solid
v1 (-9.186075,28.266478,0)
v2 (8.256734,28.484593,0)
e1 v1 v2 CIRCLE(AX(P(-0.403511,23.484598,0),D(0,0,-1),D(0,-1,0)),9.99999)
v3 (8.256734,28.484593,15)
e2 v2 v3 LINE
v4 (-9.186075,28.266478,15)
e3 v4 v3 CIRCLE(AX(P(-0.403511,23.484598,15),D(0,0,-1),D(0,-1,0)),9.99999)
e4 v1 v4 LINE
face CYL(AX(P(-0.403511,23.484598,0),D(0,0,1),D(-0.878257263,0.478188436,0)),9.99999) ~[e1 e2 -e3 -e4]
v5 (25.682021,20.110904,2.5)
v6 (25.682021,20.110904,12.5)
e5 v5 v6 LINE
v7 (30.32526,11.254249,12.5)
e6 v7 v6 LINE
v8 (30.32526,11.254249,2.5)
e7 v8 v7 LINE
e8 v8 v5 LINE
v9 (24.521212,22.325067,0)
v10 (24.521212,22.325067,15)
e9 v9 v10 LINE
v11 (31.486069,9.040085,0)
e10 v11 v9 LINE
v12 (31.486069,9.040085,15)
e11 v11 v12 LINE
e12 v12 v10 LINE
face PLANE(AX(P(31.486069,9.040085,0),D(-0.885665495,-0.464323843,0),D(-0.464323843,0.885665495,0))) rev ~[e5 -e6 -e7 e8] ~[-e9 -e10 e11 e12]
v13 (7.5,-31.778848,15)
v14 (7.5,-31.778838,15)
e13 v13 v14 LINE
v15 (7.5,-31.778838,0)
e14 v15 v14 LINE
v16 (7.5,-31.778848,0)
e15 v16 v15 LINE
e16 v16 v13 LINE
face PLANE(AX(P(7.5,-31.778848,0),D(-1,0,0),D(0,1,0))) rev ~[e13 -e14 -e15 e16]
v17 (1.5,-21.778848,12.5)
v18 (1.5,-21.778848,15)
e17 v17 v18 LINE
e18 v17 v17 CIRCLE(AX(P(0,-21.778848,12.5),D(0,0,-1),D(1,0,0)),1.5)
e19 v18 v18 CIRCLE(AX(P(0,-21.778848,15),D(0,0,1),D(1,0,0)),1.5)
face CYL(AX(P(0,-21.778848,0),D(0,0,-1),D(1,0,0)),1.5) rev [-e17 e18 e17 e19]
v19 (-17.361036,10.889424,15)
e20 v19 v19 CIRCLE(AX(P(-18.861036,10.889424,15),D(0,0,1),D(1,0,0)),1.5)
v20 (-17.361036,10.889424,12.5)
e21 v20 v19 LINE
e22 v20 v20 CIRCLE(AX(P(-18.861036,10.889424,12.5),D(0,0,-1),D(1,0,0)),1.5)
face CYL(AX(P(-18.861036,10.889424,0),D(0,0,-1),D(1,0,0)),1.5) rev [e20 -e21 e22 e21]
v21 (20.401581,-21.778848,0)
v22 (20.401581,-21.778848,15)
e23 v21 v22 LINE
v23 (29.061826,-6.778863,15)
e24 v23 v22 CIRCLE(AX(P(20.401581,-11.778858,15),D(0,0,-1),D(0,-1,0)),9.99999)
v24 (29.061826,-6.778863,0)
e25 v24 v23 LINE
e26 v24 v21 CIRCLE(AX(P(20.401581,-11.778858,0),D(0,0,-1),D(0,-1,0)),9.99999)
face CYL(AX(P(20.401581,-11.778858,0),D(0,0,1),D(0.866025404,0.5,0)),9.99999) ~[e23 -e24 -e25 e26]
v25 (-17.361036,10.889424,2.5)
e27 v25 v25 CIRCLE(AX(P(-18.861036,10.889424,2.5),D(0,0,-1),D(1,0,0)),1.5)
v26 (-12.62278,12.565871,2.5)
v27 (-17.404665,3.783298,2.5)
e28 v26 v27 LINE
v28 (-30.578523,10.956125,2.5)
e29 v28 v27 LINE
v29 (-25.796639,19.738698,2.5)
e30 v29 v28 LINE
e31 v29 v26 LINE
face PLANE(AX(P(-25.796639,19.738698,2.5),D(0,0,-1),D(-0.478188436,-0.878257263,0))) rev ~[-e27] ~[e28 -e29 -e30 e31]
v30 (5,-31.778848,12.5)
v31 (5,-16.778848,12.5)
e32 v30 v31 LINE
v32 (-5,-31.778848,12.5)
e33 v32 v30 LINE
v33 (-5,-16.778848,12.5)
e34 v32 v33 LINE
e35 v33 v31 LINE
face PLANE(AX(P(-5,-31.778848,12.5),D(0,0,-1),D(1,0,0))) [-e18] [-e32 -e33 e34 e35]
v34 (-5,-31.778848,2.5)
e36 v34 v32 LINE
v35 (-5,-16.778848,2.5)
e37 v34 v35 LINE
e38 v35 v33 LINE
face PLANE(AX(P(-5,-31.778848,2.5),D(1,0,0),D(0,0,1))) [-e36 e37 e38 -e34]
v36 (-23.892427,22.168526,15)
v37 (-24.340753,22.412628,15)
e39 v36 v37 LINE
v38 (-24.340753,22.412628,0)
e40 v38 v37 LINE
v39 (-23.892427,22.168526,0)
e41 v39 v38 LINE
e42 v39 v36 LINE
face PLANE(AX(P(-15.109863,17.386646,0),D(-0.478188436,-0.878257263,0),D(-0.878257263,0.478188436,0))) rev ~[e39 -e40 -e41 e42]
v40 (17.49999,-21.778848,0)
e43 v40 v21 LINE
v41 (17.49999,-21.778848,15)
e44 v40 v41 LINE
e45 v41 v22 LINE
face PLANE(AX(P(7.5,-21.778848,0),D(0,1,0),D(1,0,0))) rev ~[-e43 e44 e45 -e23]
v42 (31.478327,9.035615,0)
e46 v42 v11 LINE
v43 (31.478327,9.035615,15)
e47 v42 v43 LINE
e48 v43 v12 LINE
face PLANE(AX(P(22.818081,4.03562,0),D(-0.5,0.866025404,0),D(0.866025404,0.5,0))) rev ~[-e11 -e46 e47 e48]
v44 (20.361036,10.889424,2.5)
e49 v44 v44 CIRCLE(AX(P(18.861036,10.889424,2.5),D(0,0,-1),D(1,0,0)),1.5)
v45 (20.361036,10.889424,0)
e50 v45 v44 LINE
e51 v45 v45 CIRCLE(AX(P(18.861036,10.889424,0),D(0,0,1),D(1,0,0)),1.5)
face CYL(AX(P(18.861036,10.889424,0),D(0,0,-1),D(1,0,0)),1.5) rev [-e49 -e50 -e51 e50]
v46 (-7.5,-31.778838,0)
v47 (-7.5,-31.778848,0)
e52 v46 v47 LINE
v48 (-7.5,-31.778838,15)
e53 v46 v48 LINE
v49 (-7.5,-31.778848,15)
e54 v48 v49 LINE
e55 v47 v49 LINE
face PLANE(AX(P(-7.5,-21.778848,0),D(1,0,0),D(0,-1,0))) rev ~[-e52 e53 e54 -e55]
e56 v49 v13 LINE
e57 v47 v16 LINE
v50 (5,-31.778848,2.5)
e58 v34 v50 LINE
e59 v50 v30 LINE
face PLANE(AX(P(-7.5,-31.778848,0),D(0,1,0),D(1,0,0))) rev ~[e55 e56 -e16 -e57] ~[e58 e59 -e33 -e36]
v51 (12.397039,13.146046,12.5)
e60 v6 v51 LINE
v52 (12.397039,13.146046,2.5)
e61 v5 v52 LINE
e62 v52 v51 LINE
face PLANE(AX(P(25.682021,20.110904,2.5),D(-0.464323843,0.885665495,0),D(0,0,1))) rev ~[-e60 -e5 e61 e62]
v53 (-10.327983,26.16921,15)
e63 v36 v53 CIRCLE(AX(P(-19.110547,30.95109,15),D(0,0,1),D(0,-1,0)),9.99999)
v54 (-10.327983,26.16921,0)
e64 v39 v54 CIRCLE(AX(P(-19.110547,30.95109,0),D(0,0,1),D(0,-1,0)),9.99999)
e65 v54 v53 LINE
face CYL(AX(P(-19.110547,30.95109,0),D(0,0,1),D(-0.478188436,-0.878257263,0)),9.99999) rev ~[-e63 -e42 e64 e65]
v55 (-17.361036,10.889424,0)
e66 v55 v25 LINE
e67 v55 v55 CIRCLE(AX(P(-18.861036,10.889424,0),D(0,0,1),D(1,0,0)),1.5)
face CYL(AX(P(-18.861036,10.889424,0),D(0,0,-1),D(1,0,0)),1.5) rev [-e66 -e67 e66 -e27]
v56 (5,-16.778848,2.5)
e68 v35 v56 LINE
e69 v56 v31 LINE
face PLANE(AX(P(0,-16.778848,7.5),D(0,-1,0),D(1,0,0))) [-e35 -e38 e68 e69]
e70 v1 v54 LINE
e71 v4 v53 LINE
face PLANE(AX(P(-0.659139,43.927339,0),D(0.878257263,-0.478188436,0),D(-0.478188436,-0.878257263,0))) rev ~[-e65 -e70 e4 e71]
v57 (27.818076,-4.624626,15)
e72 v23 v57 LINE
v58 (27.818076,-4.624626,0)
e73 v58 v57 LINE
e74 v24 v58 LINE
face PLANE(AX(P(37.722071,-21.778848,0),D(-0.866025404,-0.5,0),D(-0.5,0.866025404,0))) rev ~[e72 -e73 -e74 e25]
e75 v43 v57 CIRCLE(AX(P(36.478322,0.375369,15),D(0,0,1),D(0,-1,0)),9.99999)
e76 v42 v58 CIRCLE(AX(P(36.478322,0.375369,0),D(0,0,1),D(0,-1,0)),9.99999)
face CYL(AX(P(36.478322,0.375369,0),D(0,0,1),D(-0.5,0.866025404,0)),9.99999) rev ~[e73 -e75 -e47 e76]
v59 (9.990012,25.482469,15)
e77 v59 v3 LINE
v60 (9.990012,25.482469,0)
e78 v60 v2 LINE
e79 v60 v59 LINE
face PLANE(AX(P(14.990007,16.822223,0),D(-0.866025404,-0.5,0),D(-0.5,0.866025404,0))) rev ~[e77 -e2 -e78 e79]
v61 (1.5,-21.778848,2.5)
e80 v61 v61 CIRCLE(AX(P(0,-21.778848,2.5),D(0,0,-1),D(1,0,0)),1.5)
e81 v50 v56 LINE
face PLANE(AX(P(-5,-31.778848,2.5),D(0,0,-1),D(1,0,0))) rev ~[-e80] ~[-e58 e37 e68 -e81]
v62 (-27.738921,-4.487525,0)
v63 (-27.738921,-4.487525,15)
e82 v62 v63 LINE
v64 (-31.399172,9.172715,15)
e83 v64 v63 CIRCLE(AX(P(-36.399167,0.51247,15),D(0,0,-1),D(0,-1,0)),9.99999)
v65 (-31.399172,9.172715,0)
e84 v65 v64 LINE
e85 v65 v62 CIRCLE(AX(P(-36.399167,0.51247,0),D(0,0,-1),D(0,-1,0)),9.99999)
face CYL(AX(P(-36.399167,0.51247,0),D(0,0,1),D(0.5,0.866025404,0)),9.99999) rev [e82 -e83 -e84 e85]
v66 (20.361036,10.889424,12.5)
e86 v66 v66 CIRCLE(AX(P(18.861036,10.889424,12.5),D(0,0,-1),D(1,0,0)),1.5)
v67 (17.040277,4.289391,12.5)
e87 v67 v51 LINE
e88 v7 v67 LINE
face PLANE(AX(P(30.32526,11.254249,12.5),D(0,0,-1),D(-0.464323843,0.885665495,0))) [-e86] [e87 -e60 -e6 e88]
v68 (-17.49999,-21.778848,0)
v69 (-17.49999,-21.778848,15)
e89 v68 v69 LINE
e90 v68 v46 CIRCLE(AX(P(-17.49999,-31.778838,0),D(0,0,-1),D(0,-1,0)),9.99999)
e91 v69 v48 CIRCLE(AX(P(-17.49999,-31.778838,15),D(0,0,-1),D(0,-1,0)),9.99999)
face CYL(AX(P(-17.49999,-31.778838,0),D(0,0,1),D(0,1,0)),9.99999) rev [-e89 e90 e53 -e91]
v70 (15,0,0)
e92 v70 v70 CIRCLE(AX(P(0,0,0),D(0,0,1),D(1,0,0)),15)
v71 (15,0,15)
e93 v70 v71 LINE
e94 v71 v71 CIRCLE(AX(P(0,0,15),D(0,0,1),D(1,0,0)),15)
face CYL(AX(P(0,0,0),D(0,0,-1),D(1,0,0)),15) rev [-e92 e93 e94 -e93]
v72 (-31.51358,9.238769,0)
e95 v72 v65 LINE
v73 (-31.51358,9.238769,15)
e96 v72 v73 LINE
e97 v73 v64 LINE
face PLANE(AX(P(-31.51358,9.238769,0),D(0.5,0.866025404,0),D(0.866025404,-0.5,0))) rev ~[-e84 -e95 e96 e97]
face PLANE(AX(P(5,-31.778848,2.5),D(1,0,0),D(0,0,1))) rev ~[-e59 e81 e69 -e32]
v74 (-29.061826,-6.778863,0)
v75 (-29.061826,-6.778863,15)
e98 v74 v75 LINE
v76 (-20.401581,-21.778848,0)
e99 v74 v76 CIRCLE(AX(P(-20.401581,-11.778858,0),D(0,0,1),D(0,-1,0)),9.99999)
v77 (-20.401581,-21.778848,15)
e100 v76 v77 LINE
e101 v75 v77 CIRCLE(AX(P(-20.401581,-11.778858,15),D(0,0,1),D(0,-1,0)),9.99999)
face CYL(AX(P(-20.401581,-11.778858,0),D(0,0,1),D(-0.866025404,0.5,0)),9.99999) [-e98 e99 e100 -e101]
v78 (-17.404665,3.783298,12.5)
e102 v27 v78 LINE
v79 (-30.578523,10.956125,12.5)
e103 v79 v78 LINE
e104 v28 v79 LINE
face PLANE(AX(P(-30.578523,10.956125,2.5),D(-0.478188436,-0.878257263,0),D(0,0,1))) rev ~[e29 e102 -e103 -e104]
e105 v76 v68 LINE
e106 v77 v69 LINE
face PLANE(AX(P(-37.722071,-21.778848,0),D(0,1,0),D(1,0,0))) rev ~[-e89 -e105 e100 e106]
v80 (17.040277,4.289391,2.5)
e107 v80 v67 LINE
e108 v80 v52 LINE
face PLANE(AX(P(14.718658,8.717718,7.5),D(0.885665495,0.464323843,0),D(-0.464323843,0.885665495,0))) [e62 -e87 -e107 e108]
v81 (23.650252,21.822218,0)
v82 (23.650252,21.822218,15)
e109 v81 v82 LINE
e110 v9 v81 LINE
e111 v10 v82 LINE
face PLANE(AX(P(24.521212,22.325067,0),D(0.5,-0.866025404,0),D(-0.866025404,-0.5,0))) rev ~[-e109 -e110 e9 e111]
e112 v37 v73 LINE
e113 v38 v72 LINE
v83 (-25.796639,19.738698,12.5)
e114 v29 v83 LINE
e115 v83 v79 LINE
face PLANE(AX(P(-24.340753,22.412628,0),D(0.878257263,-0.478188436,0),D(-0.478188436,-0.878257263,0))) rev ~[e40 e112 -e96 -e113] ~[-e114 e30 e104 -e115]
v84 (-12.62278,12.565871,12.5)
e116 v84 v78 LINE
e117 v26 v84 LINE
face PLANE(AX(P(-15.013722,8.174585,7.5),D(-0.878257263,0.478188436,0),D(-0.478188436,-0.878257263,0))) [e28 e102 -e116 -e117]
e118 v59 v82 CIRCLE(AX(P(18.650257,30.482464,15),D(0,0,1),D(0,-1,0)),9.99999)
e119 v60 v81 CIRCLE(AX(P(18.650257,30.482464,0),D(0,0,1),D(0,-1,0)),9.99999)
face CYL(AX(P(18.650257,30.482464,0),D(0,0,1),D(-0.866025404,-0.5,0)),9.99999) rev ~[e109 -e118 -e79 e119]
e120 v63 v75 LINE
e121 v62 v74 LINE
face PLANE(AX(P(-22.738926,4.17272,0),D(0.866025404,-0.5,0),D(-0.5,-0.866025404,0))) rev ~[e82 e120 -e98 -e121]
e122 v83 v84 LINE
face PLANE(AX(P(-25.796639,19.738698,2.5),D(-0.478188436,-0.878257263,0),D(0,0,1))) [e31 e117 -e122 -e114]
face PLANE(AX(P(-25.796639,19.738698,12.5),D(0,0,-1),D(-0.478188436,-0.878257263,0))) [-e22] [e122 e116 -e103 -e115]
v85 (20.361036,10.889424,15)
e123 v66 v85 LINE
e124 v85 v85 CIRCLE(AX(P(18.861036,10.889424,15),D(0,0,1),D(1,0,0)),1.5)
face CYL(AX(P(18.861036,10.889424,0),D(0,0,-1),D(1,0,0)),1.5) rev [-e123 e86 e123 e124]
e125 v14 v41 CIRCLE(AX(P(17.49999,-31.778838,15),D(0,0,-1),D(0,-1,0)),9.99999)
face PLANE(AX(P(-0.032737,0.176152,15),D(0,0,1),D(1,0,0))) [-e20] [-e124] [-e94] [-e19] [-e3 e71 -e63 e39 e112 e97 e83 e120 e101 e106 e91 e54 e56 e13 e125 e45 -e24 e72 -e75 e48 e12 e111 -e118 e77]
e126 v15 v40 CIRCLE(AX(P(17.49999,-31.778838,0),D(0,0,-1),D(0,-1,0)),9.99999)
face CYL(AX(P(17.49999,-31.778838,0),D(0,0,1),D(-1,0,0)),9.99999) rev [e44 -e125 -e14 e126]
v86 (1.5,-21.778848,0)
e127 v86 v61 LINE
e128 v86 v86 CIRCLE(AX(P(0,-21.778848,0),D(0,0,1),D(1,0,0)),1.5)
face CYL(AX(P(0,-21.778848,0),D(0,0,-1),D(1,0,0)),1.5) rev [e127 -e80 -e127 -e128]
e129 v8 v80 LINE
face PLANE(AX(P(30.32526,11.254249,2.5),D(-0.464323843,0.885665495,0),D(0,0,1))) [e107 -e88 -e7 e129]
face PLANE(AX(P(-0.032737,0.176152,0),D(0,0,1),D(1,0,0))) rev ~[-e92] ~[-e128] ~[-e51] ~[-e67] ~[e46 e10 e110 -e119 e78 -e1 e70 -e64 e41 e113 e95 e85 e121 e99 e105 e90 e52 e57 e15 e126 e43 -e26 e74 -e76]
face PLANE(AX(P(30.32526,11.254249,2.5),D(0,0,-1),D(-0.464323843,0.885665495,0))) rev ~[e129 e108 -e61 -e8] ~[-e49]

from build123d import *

# Parameters (mm, degrees)
F0_R     = 1.5
F0_R_2   = 15
F1_DEPTH = 15
F2_W     = 10
F2_H     = 10
F3_DEPTH = 15
F4_W     = 10
F4_H     = 10
F5_DEPTH = 15
F6_W     = 10
F6_H     = 10
F7_DEPTH = 15
F8_R     = 9.99999


# Not quite as in the source:
# - a fillet or chamfer is up to 0.001 mm smaller than in the source, because OpenCascade refuses the exact size


with BuildPart() as f1:
    # F0 (on Top) → F1 (new body)
    with BuildSketch(Plane.XY):
        Polygon((-24.3407530135, 22.4126278684), (-31.5135795584, 9.2387689289), (-22.7389262459, 4.1727204769), (-37.7220713048, -21.7788480222), (-7.5, -21.7788480222), (-7.5, -31.7788480222), (0, -31.7788480222), (7.5, -31.7788480222), (7.5, -21.7788480222), (37.7220713048, -21.7788480222), (22.8180813967, 4.0356197342), (31.4860692862, 9.0400848755), (24.5212116355, 22.3250672958), (14.9900065464, 16.8222234719), (-0.6591394661, 43.9273394607), (-15.1098627306, 17.3866460996), align=None)
        with Locations((0, -21.7788480222)):
            Circle(F0_R, mode=Mode.SUBTRACT)
        Circle(F0_R_2, mode=Mode.SUBTRACT)
        with Locations((-18.8610356524, 10.8894240111)):
            Circle(F0_R, mode=Mode.SUBTRACT)
        with Locations((18.8610356524, 10.8894240111)):
            Circle(F0_R, mode=Mode.SUBTRACT)
    extrude(amount=F1_DEPTH)

    # F2 (on face) → F3 (cut)
    with BuildSketch(Plane.XZ.offset(31.7788480222)):
        with Locations((0, 7.5)):
            Rectangle(F2_W, F2_H)
    extrude(amount=-F3_DEPTH, mode=Mode.SUBTRACT)

    # F4 (on face) → F5 (cut)
    with BuildSketch(Plane(origin=(-28.1875812899, 15.3474112818, 0), x_dir=(-0.4781884363, -0.8782572626, 0), z_dir=(-0.8782572626, 0.4781884363, 0))):
        with Locations((0, 7.5)):
            Rectangle(F4_W, F4_H)
    extrude(amount=-F5_DEPTH, mode=Mode.SUBTRACT)

    # F6 (on face) → F7 (cut)
    with BuildSketch(Plane(origin=(28.415383594, 14.8972046453, 0), x_dir=(-0.4643238434, 0.8856654947, 0), z_dir=(0.8856654947, 0.4643238434, 0))):
        with Locations((0.8867585393, 7.5)):
            Rectangle(F6_W, F6_H)
    extrude(amount=-F7_DEPTH, mode=Mode.SUBTRACT)

    # F8 (radius 10 in the source; OpenCascade refuses exactly that, so slightly less here)
    f8_edges = [f1.edges().sort_by_distance(p)[0] for p in [
        (37.722071, -21.778848, 7.5),
        (-0.659139, 43.927339, 7.5),
        (14.990007, 16.822223, 7.5),
        (22.818081, 4.03562, 7.5),
        (7.5, -21.778848, 7.5),
        (-7.5, -21.778848, 7.5),
        (-37.722071, -21.778848, 7.5),
        (-22.738926, 4.17272, 7.5),
        (-15.109863, 17.386646, 7.5),
    ]]
    fillet(f8_edges, radius=F8_R)


solid = f1.part
